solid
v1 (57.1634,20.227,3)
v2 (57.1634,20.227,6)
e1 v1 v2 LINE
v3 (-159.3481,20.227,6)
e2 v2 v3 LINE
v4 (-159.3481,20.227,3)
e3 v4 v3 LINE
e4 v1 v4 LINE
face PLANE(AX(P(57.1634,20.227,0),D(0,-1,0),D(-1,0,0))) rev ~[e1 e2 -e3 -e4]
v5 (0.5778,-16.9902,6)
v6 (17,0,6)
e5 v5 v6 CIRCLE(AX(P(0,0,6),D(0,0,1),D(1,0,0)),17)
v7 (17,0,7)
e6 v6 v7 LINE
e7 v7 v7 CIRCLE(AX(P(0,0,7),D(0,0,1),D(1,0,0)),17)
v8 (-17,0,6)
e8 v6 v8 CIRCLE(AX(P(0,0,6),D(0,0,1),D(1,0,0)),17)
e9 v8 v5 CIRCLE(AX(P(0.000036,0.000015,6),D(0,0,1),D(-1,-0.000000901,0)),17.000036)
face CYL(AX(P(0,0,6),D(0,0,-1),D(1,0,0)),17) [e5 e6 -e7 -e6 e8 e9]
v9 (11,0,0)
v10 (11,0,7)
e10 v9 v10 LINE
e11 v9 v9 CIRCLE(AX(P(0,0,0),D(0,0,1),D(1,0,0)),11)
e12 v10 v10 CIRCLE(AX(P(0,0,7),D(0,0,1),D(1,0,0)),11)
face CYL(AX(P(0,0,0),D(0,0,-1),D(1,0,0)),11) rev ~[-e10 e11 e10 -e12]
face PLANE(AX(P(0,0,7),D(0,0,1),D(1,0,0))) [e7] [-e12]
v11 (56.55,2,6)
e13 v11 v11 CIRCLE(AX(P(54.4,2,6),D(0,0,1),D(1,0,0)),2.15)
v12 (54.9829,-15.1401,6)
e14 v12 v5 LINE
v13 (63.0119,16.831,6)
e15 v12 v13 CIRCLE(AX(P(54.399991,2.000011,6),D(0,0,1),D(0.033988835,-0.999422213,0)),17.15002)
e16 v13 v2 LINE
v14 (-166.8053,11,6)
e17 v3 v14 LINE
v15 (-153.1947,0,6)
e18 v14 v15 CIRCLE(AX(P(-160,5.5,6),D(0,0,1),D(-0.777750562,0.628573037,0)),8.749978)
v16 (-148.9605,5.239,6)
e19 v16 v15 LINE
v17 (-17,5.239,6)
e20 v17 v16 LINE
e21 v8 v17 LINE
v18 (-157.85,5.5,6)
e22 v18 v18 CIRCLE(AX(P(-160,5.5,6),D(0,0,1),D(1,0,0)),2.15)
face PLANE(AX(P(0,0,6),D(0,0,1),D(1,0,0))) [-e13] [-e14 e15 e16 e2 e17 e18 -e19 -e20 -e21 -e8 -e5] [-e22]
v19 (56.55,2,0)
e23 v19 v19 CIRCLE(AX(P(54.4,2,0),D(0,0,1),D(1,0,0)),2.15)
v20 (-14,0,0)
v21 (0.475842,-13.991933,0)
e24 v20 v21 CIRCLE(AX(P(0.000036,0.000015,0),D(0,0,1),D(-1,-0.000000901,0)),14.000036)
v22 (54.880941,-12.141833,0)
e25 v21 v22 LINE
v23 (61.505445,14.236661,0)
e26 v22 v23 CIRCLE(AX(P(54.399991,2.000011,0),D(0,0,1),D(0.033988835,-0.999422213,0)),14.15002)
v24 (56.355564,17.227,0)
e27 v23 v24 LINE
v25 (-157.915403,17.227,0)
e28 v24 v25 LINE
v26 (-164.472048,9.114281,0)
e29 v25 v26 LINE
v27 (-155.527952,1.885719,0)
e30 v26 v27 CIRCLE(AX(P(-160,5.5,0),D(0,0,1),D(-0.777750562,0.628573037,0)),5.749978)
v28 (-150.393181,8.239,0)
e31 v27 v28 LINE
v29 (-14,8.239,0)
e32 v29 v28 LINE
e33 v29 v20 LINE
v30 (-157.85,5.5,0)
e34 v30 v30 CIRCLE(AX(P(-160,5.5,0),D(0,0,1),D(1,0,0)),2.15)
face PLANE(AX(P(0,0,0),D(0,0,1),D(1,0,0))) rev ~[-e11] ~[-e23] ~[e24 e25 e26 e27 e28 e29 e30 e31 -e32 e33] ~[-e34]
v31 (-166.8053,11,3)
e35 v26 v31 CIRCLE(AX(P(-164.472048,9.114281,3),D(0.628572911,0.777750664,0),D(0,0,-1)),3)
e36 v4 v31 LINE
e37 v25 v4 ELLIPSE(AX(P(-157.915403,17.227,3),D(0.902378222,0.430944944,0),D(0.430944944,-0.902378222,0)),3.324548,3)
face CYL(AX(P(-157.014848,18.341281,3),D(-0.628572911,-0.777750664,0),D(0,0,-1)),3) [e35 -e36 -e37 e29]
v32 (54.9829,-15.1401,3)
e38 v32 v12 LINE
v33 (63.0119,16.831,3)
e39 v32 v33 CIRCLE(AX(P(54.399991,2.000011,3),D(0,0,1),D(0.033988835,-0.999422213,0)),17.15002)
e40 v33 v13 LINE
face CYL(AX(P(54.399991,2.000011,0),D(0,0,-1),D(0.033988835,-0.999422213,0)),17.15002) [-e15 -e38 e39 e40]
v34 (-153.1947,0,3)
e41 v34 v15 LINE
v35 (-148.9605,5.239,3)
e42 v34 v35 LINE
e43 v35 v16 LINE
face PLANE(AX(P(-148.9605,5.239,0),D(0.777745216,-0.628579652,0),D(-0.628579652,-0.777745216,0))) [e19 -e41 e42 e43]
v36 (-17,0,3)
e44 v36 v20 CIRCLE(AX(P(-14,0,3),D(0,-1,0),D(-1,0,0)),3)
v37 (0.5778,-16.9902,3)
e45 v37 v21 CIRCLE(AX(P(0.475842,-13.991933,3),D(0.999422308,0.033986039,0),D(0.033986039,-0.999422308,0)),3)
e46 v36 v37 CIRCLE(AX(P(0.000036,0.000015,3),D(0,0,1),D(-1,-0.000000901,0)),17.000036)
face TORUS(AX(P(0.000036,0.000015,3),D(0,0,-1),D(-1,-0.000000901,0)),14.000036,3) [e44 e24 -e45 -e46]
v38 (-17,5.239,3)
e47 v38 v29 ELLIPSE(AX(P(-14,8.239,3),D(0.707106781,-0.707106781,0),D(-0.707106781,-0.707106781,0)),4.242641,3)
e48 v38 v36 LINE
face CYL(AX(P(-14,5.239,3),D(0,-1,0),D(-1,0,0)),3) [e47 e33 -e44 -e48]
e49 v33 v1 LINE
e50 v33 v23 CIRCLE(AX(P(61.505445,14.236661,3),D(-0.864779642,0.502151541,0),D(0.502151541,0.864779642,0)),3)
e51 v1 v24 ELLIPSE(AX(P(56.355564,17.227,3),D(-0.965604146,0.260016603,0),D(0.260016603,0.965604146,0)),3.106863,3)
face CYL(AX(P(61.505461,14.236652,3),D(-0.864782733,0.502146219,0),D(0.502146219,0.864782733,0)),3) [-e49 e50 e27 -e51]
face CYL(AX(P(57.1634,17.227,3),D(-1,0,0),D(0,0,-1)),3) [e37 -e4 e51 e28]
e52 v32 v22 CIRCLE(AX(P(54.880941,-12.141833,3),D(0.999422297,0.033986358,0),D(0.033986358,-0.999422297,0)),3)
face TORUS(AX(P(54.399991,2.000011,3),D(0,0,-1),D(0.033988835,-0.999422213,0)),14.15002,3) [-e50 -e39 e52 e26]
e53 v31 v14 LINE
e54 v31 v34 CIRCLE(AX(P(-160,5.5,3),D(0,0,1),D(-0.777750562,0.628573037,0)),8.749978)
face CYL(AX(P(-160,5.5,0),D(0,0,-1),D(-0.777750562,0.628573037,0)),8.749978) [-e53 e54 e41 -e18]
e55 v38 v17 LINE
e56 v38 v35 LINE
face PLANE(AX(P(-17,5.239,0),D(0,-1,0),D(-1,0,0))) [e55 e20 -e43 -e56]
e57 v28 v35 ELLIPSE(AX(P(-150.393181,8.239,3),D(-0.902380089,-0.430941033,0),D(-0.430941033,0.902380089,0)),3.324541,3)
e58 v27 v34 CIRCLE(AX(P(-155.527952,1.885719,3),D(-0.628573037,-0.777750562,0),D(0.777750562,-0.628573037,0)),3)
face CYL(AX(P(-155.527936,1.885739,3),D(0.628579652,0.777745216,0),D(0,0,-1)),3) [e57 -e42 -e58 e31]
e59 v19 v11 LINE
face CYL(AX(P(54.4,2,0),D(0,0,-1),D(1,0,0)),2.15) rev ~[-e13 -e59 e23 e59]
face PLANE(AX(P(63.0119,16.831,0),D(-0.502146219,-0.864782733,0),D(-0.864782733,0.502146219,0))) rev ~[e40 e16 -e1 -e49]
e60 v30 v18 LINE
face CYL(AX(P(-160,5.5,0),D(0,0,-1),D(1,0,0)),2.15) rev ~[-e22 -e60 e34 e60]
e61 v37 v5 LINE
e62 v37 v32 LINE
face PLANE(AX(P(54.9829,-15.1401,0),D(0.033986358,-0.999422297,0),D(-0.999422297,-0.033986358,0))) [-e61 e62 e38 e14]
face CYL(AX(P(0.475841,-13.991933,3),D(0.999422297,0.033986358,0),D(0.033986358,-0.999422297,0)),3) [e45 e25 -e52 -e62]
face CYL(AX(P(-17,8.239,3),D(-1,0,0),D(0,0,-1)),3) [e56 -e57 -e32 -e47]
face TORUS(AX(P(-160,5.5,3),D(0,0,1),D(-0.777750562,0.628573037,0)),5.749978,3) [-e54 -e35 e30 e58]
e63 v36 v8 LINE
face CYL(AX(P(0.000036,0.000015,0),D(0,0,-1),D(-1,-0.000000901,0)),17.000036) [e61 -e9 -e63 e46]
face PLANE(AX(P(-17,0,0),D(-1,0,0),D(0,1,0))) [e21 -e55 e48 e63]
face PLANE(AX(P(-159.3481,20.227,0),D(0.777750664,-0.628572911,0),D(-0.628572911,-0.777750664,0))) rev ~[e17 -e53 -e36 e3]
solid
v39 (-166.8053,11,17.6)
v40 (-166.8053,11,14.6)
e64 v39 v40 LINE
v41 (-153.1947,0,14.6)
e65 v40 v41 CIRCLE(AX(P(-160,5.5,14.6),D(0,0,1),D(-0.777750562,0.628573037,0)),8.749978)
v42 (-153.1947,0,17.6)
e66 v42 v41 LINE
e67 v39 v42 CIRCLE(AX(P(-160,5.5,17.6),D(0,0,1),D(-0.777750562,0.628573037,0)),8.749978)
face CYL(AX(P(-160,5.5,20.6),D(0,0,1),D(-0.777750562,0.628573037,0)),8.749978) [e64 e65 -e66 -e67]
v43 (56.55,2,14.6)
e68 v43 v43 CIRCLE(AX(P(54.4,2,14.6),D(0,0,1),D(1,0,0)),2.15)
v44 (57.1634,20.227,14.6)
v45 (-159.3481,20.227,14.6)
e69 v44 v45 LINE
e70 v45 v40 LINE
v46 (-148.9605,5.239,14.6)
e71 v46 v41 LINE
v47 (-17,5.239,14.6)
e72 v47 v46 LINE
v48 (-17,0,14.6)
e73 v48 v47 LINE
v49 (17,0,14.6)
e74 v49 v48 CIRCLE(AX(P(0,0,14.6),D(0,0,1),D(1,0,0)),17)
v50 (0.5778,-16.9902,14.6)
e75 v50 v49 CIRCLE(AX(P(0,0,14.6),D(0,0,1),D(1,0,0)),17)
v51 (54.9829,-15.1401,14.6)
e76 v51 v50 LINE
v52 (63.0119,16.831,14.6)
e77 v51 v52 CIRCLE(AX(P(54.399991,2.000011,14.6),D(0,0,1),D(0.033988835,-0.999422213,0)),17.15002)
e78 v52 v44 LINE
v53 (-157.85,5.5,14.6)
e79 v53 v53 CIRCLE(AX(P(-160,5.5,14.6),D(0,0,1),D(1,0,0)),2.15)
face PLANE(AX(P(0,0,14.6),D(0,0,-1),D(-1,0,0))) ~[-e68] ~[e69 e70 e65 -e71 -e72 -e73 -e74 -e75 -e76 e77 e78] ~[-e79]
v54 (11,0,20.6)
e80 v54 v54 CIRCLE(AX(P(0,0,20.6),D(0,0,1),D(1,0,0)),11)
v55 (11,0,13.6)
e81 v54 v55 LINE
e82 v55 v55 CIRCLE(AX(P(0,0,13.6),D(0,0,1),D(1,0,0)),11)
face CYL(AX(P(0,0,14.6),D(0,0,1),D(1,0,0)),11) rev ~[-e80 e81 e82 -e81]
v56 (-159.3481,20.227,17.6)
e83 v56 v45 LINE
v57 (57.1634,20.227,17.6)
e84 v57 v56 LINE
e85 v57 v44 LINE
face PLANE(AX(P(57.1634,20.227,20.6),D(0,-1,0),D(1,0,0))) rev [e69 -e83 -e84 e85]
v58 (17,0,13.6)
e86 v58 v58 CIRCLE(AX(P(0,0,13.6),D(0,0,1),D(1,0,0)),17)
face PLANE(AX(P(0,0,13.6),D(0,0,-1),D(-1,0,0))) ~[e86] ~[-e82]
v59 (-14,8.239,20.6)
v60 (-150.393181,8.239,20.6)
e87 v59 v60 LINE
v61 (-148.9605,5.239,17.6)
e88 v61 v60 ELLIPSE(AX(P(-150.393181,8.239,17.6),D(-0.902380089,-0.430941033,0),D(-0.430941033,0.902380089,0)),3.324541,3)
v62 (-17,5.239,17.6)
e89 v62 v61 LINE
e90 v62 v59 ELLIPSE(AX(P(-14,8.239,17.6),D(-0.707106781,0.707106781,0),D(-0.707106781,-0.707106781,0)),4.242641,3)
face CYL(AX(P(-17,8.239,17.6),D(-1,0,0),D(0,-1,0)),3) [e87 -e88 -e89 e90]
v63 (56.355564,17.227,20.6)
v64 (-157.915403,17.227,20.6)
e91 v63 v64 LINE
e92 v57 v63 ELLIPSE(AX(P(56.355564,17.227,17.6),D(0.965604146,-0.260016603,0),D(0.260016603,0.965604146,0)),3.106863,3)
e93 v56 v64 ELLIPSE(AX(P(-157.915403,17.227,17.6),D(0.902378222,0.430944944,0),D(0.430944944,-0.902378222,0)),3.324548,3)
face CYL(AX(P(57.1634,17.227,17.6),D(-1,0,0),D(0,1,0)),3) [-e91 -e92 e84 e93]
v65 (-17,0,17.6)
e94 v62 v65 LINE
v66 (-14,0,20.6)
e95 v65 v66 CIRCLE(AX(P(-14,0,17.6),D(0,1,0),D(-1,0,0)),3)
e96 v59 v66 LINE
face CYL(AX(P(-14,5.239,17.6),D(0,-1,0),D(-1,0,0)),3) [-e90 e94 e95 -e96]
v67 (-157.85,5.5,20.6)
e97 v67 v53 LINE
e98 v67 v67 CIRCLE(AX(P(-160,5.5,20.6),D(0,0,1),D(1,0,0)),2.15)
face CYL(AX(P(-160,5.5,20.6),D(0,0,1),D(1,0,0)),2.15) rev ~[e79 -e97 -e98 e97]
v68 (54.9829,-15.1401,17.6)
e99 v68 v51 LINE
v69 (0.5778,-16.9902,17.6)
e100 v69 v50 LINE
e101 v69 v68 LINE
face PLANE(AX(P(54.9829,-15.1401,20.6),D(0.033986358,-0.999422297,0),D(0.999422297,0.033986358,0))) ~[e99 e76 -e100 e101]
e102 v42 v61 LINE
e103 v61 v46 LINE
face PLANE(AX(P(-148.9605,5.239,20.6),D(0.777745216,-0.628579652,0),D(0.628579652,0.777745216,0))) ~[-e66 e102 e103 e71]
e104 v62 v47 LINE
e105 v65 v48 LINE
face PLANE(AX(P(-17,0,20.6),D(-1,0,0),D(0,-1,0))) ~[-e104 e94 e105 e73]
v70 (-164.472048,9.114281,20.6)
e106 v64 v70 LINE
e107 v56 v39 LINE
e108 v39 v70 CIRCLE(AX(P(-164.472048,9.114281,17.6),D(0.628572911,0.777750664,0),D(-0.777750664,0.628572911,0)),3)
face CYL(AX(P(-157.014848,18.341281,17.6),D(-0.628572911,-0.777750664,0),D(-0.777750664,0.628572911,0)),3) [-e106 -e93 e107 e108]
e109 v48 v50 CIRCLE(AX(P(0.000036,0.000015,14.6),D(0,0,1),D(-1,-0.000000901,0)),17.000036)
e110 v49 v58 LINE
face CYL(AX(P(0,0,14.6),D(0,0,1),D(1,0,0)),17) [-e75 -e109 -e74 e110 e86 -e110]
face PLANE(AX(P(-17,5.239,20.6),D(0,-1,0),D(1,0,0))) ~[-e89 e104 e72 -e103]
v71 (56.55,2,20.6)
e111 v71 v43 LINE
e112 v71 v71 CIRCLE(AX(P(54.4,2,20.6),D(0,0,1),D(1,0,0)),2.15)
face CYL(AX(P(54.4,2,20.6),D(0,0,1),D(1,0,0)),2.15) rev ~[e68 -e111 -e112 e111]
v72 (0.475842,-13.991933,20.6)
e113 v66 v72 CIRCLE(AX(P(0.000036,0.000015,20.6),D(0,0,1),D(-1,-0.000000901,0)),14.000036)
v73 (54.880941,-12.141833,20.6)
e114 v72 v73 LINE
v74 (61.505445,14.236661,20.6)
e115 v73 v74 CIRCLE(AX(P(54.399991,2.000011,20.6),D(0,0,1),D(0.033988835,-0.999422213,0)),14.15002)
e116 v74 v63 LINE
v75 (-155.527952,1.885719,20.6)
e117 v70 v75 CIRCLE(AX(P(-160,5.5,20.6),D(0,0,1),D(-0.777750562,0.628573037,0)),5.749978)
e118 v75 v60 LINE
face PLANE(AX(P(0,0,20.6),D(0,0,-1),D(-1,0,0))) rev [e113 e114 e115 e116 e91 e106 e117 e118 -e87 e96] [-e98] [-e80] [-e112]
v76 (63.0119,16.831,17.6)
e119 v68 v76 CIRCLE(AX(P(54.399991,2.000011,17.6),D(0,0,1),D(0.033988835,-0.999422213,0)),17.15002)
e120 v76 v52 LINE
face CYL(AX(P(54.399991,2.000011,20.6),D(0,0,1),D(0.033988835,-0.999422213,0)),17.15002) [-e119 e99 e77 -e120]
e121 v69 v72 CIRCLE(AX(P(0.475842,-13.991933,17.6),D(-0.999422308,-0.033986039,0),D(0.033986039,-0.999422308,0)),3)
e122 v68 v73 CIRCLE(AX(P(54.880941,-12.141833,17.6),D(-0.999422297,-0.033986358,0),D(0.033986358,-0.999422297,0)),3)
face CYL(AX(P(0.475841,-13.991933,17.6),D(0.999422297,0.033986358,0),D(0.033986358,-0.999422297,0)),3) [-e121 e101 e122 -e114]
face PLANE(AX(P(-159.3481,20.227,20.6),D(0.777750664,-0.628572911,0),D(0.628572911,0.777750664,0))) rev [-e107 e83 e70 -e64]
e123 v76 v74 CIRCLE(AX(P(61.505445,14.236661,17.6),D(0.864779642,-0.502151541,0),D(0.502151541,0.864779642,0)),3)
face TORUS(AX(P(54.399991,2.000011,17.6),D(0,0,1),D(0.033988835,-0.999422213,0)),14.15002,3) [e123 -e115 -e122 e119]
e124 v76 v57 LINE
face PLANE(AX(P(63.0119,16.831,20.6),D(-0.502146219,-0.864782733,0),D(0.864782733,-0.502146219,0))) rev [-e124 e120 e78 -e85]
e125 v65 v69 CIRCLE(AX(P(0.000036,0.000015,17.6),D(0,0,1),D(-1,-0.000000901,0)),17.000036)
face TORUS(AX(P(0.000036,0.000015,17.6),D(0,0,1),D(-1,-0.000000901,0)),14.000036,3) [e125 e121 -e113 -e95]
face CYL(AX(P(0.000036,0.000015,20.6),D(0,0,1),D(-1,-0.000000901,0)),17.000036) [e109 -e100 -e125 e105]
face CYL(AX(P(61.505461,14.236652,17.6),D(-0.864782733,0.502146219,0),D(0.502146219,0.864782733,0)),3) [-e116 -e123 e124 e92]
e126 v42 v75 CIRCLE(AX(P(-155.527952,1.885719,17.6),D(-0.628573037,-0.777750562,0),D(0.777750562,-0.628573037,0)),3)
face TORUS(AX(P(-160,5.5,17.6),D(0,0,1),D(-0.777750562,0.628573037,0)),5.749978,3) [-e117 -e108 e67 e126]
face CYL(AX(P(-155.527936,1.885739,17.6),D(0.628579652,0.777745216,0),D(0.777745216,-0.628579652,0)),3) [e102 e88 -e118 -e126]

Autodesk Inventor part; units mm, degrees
ref_plane "YZ Plane" through (0, 0, 0) normal (1, 0, 0) x (0, 1, 0)
ref_plane "XZ Plane" through (0, 0, 0) normal (0, 1, 0) x (-1, 0, 0)
sketch "Sketch1" plane through (0, 0, 0) normal (0, 0, 1) x (1, 0, 0)
  circle A0 centre (0, 0) radius 11
  circle A1 centre (-160, 5.5) radius 2.15
  circle A2 centre (54.4, 2) radius 2.15
  arc A3 (54.9829, -15.1401) -> (63.0119, 16.831) centre (54.4, 2) ccw
  arc A4 (-166.8053, 11) -> (-153.1947, 0) centre (-160, 5.5) ccw
  arc A5 (-17, 0) -> (0.5778, -16.9902) centre (0, 0) ccw
  line L0 (-262.8088, 0) -> (191.982, 0) construction
  line L1 (54.9829, -15.1401) -> (0.5778, -16.9902)
  line L2 (63.0119, 16.831) -> (57.1634, 20.227)
  line L3 (57.1634, 20.227) -> (-159.3481, 20.227)
  line L4 (-159.3481, 20.227) -> (-166.8053, 11)
  line L5 (-17, 0) -> (-17, 5.239)
  line L6 (-17, 5.239) -> (-148.9605, 5.239)
  line L7 (-148.9605, 5.239) -> (-153.1947, 0)
  dimension "d0" = 22
  dimension "d1" = 4.3
  dimension "d2" = 160
  dimension "d3" = 5.5
  dimension "d4" = 4.3
  dimension "d5" = 54.4
  dimension "d6" = 2
  dimension "d7" = 15
  dimension "d9" = 6
  dimension "d20" = 6.6
extrude "Extrusion1" add sketch "Sketch1" along normal blind 6
sketch "Sketch2" plane through (0, 0, 6) normal (0, 0, 1) x (1, 0, 0)
  circle A0 centre (0, 0) radius 11 projected
  circle A1 centre (0, 0) radius 17
extrude "Extrusion2" add sketch "Sketch2" along normal blind 1
fillet "Fillet2" radius 3 5 edges at (-165.5, -1.3053, 0) (-11.8148, -12.2234, 0) (71.0335, -2.1772, 0) (-51.0924, 20.227, 0) (-82.9803, 5.239, 0)
ref_plane "Work Plane1" through (0, 0, 10.3) normal (0, 0, -1) x (-1, 0, 0)
mirror "Mirror2" about plane through (0, 0, 10.3) normal (0, 0, -1) of "Extrusion1", "Fillet2", "Extrusion2"
properties part number "Arm 20X - forearm r"
